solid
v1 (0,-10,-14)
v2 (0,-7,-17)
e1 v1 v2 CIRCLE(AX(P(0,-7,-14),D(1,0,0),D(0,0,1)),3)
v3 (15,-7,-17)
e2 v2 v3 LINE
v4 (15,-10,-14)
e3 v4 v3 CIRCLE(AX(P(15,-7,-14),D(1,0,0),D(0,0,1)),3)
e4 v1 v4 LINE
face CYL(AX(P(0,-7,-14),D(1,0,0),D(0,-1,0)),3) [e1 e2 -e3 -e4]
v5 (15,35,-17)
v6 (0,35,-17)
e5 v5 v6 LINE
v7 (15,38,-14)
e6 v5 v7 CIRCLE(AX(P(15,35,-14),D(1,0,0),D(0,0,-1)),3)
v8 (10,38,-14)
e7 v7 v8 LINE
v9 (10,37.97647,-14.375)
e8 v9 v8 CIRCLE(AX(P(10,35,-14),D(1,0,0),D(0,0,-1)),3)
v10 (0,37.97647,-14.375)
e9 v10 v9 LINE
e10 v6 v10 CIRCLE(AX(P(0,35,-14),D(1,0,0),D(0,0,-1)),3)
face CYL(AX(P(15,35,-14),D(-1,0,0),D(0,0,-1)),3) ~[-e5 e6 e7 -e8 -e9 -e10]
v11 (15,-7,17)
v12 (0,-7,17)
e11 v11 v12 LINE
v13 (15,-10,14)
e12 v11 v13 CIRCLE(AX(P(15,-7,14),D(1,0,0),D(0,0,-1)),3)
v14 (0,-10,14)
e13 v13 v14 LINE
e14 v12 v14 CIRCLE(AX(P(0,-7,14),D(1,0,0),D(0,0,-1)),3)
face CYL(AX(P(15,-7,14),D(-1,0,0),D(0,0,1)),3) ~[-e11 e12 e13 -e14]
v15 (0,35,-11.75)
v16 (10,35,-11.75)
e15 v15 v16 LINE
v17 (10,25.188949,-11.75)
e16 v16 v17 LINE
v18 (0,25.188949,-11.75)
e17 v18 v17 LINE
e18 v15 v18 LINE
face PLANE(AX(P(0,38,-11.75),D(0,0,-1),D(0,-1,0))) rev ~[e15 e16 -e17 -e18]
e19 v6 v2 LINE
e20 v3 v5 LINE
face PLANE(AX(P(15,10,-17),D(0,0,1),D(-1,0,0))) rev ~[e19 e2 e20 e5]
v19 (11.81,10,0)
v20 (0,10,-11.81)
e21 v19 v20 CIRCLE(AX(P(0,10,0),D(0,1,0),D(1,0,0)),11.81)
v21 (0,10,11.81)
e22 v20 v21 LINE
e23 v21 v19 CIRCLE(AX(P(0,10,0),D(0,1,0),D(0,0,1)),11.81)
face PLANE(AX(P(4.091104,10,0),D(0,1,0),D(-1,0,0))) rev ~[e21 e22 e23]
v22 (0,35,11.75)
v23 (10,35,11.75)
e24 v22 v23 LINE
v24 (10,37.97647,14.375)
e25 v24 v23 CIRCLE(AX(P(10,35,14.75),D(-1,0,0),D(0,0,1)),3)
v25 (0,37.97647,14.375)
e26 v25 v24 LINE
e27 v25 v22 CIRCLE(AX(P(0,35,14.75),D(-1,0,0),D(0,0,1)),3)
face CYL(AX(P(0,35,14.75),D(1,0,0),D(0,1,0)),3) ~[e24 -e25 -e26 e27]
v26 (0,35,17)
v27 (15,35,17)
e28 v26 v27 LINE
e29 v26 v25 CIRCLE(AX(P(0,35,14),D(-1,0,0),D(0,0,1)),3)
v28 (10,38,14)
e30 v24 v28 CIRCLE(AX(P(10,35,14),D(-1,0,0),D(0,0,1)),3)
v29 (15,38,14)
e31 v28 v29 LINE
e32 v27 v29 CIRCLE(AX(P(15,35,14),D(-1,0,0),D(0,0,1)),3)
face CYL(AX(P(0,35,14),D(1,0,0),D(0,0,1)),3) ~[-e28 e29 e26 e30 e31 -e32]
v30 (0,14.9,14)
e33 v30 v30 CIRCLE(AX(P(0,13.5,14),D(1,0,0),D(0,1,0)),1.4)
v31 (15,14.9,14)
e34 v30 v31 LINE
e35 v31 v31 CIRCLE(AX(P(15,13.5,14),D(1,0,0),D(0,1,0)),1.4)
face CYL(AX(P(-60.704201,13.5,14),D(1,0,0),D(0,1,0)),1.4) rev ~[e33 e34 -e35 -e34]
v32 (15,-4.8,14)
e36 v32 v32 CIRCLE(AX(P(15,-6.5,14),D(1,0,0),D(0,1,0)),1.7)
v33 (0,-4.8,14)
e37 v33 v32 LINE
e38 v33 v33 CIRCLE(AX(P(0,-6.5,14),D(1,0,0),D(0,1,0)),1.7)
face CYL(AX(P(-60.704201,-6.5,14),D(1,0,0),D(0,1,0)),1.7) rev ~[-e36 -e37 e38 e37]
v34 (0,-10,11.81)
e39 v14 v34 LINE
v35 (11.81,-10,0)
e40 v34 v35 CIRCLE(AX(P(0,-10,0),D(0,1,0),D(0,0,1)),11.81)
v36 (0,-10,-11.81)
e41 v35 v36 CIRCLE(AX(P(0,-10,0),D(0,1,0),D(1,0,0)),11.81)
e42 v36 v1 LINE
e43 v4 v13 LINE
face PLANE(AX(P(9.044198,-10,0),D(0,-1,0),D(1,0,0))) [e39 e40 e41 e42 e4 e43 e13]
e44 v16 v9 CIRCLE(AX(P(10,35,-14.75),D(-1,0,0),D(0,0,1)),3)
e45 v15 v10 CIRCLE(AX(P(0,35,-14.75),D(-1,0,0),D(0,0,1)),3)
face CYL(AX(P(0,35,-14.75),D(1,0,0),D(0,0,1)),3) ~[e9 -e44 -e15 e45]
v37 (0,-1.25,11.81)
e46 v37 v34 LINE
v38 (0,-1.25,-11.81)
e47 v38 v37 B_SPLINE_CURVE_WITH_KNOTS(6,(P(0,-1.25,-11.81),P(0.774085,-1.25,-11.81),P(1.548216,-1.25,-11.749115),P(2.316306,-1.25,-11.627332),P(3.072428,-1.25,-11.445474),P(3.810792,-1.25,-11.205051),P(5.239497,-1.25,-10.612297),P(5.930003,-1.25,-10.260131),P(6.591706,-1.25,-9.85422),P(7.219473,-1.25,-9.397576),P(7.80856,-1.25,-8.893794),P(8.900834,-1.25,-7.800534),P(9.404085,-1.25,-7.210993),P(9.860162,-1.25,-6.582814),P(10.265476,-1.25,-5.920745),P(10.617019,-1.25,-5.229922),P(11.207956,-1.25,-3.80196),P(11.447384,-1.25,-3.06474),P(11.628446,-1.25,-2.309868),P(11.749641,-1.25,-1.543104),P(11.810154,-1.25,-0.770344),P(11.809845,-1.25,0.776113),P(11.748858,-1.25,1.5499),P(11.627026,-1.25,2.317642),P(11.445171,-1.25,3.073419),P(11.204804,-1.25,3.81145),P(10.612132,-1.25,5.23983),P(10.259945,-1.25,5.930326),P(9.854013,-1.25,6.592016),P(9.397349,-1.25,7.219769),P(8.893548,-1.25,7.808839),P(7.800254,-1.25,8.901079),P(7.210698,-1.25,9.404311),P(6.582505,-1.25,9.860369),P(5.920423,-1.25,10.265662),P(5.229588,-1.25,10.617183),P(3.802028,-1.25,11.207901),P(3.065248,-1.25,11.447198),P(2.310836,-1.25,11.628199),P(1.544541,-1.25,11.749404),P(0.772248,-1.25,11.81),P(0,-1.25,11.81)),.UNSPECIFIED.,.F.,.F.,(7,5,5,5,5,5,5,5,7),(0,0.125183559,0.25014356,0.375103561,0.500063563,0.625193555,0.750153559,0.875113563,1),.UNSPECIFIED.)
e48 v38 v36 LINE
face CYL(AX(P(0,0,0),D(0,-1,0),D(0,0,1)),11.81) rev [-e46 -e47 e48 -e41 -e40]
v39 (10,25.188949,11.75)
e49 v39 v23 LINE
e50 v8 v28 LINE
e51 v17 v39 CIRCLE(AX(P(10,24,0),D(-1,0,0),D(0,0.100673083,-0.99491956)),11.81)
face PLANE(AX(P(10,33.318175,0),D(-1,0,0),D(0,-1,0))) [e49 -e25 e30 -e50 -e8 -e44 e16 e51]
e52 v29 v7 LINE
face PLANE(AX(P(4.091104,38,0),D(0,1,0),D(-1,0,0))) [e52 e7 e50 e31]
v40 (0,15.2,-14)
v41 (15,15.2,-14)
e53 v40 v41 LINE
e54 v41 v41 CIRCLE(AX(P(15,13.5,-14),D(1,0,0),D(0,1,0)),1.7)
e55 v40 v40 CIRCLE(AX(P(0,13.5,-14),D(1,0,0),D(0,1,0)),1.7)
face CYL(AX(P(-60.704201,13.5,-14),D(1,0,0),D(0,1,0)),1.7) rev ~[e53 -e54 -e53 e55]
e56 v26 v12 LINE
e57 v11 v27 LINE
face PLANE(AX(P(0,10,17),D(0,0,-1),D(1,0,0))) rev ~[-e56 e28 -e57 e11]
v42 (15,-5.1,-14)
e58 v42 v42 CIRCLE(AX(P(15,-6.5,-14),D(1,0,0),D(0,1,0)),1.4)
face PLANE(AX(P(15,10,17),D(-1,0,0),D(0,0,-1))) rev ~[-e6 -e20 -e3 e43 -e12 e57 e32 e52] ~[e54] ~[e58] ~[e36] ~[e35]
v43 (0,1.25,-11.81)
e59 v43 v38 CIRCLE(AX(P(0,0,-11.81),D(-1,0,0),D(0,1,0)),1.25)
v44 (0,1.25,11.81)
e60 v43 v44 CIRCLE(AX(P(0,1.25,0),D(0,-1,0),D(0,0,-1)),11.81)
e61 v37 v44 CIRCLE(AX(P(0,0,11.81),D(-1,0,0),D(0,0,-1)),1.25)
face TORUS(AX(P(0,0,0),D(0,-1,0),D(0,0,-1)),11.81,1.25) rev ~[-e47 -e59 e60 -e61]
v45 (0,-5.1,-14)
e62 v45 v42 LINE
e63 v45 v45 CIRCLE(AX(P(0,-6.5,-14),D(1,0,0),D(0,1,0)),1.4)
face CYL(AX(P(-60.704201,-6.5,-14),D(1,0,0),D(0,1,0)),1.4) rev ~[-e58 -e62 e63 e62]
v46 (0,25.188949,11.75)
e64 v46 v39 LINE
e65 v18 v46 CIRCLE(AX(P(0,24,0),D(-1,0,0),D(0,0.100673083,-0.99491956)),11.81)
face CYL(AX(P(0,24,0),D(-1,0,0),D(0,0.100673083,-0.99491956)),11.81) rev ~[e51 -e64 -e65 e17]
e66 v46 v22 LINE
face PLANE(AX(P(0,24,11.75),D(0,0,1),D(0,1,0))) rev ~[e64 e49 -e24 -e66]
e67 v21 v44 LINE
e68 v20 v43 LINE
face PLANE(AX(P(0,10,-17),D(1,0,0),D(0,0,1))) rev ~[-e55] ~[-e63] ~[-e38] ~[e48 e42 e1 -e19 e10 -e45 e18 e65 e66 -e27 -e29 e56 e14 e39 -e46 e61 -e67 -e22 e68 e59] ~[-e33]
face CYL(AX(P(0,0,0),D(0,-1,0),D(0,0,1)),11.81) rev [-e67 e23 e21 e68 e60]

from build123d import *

# Parameters (mm, degrees)
F1_DEPTH      = 10
F1_DEPTH_BACK = 10
F5_DEPTH      = 28
F8_D          = 2.8
F8_ON_F2_D    = 2.8
F9_D          = 3.4
F9_ON_F2_D    = 3.4
F10_DEPTH     = 10
F11_F1_R      = 3
F11_F2_R      = 3
F11_F3_R      = 3
F11_F4_R      = 3
F11_F5_R      = 3
F11_F6_R      = 3
F12_DEPTH     = 10


with BuildPart() as f1:
    # F0 (on Front) → F1 (new body, two sides)
    with BuildSketch(Plane.XZ) as f1_sk:
        with BuildLine():
            Line((15, 17), (0, 17))
            Line((0, 17), (0, 11.81))
            ThreePointArc((0, 11.81), (8.3509310858, 8.3509310858), (11.81, 0))
            ThreePointArc((11.81, 0), (8.3509310858, -8.3509310858), (0, -11.81))
            Line((0, -11.81), (0, -17))
            Line((0, -17), (15, -17))
            Line((15, -17), (15, 17))
        make_face()
    extrude(amount=F1_DEPTH)
    extrude(f1_sk.sketch, amount=-F1_DEPTH_BACK)

    # F2 (on face) → F3 (revolve, cut)
    with BuildSketch(Plane(origin=(0, 0, 0), x_dir=(0, -1, 0), z_dir=(-1, 0, 0))):
        with BuildLine():
            Line((-1.25, -11.81), (1.25, -11.81))
            ThreePointArc((1.25, -11.81), (0, -10.56), (-1.25, -11.81))
        make_face()
        with BuildLine():
            ThreePointArc((-1.25, -11.81), (0, -13.06), (1.25, -11.81))
            Line((1.25, -11.81), (-1.25, -11.81))
        make_face()
    revolve(axis=Axis((0, 0, 0), (0, -1, 0)), mode=Mode.SUBTRACT)

    # F4 (on face) → F5 (join)
    with BuildSketch(Plane(origin=(0, 10, 0), x_dir=(-1, 0, 0), z_dir=(0, 1, 0))):
        with BuildLine():
            Line((0, -11.81), (0, 11.81))
            ThreePointArc((0, 11.81), (-11.81, 0), (0, -11.81))
        make_face()
        with BuildLine():
            Line((0, 17), (-15, 17))
            Line((-15, 17), (-15, -17))
            Line((-15, -17), (0, -17))
            Line((0, -17), (0, -11.81))
            ThreePointArc((0, -11.81), (-11.81, 0), (0, 11.81))
            Line((0, 11.81), (0, 17))
        make_face()
    extrude(amount=F5_DEPTH)

    # F6: union 

    # F8 (through all)
    with Locations(Plane(origin=(0, 0, 0), x_dir=(0, -1, 0), z_dir=(-1, 0, 0))):
        with Locations((-13.5, 14)):
            Hole(F8_D / 2)

    # F8 on F2 (through all)
    with Locations(Plane(origin=(0, 0, 0), x_dir=(0, -1, 0), z_dir=(-1, 0, 0))):
        with Locations((6.5, -14)):
            Hole(F8_ON_F2_D / 2)

    # F9 (through all)
    with Locations(Plane(origin=(0, 0, 0), x_dir=(0, -1, 0), z_dir=(-1, 0, 0))):
        with Locations((-13.5, -14)):
            Hole(F9_D / 2)

    # F9 on F2 (through all)
    with Locations(Plane(origin=(0, 0, 0), x_dir=(0, -1, 0), z_dir=(-1, 0, 0))):
        with Locations((6.5, 14)):
            Hole(F9_ON_F2_D / 2)

    # F7 (on face) → F10 (cut)
    with BuildSketch(Plane(origin=(0, 0, 0), x_dir=(0, -1, 0), z_dir=(-1, 0, 0))):
        with BuildLine():
            Line((-38, 11.75), (-38, -11.75))
            Line((-38, -11.75), (-25.1889491158, -11.75))
            ThreePointArc((-25.1889491158, -11.75), (-35.81, 0), (-25.1889491158, 11.75))
            Line((-25.1889491158, 11.75), (-38, 11.75))
        make_face()
        with BuildLine():
            ThreePointArc((-25.1889491158, 11.75), (-35.81, 0), (-25.1889491158, -11.75))
            Line((-25.1889491158, -11.75), (-24, -11.75))
            Line((-24, -11.75), (-24, 11.75))
            Line((-24, 11.75), (-25.1889491158, 11.75))
        make_face()
    extrude(amount=-F10_DEPTH, mode=Mode.SUBTRACT)

    # F11: fillet of radius 3 on 6 edges, made by hand

    # F11_f1
    f11_f1_edges = [f1.edges().sort_by_distance(p)[0] for p in [
        (5, 38, 11.75),
    ]]
    fillet(f11_f1_edges, radius=F11_F1_R)

    # F11_f2
    f11_f2_edges = [f1.edges().sort_by_distance(p)[0] for p in [
        (5, 38, -11.75),
    ]]
    fillet(f11_f2_edges, radius=F11_F2_R)

    # F11_f3
    f11_f3_edges = [f1.edges().sort_by_distance(p)[0] for p in [
        (7.5, -10, 17),
    ]]
    fillet(f11_f3_edges, radius=F11_F3_R)

    # F11_f4
    f11_f4_edges = [f1.edges().sort_by_distance(p)[0] for p in [
        (7.5, 38, 17),
    ]]
    fillet(f11_f4_edges, radius=F11_F4_R)

    # F11_f5
    f11_f5_edges = [f1.edges().sort_by_distance(p)[0] for p in [
        (7.5, -10, -17),
    ]]
    fillet(f11_f5_edges, radius=F11_F5_R)

    # F11_f6
    f11_f6_edges = [f1.edges().sort_by_distance(p)[0] for p in [
        (7.5, 38, -17),
    ]]
    fillet(f11_f6_edges, radius=F11_F6_R)

    # F7 (on face) → F12 (cut)
    with BuildSketch(Plane(origin=(0, 0, 0), x_dir=(0, -1, 0), z_dir=(-1, 0, 0))):
        with BuildLine():
            Line((-24, -11.75), (-25.1889491158, -11.75))
            ThreePointArc((-25.1889491158, -11.75), (-16.0805741704, -8.7612096499), (-12.19, 0))
            ThreePointArc((-12.19, 0), (-16.0805741704, 8.7612096499), (-25.1889491158, 11.75))
            Line((-25.1889491158, 11.75), (-24, 11.75))
            Line((-24, 11.75), (-24, -11.75))
        make_face()
    extrude(amount=-F12_DEPTH, mode=Mode.SUBTRACT)


solid = f1.part
